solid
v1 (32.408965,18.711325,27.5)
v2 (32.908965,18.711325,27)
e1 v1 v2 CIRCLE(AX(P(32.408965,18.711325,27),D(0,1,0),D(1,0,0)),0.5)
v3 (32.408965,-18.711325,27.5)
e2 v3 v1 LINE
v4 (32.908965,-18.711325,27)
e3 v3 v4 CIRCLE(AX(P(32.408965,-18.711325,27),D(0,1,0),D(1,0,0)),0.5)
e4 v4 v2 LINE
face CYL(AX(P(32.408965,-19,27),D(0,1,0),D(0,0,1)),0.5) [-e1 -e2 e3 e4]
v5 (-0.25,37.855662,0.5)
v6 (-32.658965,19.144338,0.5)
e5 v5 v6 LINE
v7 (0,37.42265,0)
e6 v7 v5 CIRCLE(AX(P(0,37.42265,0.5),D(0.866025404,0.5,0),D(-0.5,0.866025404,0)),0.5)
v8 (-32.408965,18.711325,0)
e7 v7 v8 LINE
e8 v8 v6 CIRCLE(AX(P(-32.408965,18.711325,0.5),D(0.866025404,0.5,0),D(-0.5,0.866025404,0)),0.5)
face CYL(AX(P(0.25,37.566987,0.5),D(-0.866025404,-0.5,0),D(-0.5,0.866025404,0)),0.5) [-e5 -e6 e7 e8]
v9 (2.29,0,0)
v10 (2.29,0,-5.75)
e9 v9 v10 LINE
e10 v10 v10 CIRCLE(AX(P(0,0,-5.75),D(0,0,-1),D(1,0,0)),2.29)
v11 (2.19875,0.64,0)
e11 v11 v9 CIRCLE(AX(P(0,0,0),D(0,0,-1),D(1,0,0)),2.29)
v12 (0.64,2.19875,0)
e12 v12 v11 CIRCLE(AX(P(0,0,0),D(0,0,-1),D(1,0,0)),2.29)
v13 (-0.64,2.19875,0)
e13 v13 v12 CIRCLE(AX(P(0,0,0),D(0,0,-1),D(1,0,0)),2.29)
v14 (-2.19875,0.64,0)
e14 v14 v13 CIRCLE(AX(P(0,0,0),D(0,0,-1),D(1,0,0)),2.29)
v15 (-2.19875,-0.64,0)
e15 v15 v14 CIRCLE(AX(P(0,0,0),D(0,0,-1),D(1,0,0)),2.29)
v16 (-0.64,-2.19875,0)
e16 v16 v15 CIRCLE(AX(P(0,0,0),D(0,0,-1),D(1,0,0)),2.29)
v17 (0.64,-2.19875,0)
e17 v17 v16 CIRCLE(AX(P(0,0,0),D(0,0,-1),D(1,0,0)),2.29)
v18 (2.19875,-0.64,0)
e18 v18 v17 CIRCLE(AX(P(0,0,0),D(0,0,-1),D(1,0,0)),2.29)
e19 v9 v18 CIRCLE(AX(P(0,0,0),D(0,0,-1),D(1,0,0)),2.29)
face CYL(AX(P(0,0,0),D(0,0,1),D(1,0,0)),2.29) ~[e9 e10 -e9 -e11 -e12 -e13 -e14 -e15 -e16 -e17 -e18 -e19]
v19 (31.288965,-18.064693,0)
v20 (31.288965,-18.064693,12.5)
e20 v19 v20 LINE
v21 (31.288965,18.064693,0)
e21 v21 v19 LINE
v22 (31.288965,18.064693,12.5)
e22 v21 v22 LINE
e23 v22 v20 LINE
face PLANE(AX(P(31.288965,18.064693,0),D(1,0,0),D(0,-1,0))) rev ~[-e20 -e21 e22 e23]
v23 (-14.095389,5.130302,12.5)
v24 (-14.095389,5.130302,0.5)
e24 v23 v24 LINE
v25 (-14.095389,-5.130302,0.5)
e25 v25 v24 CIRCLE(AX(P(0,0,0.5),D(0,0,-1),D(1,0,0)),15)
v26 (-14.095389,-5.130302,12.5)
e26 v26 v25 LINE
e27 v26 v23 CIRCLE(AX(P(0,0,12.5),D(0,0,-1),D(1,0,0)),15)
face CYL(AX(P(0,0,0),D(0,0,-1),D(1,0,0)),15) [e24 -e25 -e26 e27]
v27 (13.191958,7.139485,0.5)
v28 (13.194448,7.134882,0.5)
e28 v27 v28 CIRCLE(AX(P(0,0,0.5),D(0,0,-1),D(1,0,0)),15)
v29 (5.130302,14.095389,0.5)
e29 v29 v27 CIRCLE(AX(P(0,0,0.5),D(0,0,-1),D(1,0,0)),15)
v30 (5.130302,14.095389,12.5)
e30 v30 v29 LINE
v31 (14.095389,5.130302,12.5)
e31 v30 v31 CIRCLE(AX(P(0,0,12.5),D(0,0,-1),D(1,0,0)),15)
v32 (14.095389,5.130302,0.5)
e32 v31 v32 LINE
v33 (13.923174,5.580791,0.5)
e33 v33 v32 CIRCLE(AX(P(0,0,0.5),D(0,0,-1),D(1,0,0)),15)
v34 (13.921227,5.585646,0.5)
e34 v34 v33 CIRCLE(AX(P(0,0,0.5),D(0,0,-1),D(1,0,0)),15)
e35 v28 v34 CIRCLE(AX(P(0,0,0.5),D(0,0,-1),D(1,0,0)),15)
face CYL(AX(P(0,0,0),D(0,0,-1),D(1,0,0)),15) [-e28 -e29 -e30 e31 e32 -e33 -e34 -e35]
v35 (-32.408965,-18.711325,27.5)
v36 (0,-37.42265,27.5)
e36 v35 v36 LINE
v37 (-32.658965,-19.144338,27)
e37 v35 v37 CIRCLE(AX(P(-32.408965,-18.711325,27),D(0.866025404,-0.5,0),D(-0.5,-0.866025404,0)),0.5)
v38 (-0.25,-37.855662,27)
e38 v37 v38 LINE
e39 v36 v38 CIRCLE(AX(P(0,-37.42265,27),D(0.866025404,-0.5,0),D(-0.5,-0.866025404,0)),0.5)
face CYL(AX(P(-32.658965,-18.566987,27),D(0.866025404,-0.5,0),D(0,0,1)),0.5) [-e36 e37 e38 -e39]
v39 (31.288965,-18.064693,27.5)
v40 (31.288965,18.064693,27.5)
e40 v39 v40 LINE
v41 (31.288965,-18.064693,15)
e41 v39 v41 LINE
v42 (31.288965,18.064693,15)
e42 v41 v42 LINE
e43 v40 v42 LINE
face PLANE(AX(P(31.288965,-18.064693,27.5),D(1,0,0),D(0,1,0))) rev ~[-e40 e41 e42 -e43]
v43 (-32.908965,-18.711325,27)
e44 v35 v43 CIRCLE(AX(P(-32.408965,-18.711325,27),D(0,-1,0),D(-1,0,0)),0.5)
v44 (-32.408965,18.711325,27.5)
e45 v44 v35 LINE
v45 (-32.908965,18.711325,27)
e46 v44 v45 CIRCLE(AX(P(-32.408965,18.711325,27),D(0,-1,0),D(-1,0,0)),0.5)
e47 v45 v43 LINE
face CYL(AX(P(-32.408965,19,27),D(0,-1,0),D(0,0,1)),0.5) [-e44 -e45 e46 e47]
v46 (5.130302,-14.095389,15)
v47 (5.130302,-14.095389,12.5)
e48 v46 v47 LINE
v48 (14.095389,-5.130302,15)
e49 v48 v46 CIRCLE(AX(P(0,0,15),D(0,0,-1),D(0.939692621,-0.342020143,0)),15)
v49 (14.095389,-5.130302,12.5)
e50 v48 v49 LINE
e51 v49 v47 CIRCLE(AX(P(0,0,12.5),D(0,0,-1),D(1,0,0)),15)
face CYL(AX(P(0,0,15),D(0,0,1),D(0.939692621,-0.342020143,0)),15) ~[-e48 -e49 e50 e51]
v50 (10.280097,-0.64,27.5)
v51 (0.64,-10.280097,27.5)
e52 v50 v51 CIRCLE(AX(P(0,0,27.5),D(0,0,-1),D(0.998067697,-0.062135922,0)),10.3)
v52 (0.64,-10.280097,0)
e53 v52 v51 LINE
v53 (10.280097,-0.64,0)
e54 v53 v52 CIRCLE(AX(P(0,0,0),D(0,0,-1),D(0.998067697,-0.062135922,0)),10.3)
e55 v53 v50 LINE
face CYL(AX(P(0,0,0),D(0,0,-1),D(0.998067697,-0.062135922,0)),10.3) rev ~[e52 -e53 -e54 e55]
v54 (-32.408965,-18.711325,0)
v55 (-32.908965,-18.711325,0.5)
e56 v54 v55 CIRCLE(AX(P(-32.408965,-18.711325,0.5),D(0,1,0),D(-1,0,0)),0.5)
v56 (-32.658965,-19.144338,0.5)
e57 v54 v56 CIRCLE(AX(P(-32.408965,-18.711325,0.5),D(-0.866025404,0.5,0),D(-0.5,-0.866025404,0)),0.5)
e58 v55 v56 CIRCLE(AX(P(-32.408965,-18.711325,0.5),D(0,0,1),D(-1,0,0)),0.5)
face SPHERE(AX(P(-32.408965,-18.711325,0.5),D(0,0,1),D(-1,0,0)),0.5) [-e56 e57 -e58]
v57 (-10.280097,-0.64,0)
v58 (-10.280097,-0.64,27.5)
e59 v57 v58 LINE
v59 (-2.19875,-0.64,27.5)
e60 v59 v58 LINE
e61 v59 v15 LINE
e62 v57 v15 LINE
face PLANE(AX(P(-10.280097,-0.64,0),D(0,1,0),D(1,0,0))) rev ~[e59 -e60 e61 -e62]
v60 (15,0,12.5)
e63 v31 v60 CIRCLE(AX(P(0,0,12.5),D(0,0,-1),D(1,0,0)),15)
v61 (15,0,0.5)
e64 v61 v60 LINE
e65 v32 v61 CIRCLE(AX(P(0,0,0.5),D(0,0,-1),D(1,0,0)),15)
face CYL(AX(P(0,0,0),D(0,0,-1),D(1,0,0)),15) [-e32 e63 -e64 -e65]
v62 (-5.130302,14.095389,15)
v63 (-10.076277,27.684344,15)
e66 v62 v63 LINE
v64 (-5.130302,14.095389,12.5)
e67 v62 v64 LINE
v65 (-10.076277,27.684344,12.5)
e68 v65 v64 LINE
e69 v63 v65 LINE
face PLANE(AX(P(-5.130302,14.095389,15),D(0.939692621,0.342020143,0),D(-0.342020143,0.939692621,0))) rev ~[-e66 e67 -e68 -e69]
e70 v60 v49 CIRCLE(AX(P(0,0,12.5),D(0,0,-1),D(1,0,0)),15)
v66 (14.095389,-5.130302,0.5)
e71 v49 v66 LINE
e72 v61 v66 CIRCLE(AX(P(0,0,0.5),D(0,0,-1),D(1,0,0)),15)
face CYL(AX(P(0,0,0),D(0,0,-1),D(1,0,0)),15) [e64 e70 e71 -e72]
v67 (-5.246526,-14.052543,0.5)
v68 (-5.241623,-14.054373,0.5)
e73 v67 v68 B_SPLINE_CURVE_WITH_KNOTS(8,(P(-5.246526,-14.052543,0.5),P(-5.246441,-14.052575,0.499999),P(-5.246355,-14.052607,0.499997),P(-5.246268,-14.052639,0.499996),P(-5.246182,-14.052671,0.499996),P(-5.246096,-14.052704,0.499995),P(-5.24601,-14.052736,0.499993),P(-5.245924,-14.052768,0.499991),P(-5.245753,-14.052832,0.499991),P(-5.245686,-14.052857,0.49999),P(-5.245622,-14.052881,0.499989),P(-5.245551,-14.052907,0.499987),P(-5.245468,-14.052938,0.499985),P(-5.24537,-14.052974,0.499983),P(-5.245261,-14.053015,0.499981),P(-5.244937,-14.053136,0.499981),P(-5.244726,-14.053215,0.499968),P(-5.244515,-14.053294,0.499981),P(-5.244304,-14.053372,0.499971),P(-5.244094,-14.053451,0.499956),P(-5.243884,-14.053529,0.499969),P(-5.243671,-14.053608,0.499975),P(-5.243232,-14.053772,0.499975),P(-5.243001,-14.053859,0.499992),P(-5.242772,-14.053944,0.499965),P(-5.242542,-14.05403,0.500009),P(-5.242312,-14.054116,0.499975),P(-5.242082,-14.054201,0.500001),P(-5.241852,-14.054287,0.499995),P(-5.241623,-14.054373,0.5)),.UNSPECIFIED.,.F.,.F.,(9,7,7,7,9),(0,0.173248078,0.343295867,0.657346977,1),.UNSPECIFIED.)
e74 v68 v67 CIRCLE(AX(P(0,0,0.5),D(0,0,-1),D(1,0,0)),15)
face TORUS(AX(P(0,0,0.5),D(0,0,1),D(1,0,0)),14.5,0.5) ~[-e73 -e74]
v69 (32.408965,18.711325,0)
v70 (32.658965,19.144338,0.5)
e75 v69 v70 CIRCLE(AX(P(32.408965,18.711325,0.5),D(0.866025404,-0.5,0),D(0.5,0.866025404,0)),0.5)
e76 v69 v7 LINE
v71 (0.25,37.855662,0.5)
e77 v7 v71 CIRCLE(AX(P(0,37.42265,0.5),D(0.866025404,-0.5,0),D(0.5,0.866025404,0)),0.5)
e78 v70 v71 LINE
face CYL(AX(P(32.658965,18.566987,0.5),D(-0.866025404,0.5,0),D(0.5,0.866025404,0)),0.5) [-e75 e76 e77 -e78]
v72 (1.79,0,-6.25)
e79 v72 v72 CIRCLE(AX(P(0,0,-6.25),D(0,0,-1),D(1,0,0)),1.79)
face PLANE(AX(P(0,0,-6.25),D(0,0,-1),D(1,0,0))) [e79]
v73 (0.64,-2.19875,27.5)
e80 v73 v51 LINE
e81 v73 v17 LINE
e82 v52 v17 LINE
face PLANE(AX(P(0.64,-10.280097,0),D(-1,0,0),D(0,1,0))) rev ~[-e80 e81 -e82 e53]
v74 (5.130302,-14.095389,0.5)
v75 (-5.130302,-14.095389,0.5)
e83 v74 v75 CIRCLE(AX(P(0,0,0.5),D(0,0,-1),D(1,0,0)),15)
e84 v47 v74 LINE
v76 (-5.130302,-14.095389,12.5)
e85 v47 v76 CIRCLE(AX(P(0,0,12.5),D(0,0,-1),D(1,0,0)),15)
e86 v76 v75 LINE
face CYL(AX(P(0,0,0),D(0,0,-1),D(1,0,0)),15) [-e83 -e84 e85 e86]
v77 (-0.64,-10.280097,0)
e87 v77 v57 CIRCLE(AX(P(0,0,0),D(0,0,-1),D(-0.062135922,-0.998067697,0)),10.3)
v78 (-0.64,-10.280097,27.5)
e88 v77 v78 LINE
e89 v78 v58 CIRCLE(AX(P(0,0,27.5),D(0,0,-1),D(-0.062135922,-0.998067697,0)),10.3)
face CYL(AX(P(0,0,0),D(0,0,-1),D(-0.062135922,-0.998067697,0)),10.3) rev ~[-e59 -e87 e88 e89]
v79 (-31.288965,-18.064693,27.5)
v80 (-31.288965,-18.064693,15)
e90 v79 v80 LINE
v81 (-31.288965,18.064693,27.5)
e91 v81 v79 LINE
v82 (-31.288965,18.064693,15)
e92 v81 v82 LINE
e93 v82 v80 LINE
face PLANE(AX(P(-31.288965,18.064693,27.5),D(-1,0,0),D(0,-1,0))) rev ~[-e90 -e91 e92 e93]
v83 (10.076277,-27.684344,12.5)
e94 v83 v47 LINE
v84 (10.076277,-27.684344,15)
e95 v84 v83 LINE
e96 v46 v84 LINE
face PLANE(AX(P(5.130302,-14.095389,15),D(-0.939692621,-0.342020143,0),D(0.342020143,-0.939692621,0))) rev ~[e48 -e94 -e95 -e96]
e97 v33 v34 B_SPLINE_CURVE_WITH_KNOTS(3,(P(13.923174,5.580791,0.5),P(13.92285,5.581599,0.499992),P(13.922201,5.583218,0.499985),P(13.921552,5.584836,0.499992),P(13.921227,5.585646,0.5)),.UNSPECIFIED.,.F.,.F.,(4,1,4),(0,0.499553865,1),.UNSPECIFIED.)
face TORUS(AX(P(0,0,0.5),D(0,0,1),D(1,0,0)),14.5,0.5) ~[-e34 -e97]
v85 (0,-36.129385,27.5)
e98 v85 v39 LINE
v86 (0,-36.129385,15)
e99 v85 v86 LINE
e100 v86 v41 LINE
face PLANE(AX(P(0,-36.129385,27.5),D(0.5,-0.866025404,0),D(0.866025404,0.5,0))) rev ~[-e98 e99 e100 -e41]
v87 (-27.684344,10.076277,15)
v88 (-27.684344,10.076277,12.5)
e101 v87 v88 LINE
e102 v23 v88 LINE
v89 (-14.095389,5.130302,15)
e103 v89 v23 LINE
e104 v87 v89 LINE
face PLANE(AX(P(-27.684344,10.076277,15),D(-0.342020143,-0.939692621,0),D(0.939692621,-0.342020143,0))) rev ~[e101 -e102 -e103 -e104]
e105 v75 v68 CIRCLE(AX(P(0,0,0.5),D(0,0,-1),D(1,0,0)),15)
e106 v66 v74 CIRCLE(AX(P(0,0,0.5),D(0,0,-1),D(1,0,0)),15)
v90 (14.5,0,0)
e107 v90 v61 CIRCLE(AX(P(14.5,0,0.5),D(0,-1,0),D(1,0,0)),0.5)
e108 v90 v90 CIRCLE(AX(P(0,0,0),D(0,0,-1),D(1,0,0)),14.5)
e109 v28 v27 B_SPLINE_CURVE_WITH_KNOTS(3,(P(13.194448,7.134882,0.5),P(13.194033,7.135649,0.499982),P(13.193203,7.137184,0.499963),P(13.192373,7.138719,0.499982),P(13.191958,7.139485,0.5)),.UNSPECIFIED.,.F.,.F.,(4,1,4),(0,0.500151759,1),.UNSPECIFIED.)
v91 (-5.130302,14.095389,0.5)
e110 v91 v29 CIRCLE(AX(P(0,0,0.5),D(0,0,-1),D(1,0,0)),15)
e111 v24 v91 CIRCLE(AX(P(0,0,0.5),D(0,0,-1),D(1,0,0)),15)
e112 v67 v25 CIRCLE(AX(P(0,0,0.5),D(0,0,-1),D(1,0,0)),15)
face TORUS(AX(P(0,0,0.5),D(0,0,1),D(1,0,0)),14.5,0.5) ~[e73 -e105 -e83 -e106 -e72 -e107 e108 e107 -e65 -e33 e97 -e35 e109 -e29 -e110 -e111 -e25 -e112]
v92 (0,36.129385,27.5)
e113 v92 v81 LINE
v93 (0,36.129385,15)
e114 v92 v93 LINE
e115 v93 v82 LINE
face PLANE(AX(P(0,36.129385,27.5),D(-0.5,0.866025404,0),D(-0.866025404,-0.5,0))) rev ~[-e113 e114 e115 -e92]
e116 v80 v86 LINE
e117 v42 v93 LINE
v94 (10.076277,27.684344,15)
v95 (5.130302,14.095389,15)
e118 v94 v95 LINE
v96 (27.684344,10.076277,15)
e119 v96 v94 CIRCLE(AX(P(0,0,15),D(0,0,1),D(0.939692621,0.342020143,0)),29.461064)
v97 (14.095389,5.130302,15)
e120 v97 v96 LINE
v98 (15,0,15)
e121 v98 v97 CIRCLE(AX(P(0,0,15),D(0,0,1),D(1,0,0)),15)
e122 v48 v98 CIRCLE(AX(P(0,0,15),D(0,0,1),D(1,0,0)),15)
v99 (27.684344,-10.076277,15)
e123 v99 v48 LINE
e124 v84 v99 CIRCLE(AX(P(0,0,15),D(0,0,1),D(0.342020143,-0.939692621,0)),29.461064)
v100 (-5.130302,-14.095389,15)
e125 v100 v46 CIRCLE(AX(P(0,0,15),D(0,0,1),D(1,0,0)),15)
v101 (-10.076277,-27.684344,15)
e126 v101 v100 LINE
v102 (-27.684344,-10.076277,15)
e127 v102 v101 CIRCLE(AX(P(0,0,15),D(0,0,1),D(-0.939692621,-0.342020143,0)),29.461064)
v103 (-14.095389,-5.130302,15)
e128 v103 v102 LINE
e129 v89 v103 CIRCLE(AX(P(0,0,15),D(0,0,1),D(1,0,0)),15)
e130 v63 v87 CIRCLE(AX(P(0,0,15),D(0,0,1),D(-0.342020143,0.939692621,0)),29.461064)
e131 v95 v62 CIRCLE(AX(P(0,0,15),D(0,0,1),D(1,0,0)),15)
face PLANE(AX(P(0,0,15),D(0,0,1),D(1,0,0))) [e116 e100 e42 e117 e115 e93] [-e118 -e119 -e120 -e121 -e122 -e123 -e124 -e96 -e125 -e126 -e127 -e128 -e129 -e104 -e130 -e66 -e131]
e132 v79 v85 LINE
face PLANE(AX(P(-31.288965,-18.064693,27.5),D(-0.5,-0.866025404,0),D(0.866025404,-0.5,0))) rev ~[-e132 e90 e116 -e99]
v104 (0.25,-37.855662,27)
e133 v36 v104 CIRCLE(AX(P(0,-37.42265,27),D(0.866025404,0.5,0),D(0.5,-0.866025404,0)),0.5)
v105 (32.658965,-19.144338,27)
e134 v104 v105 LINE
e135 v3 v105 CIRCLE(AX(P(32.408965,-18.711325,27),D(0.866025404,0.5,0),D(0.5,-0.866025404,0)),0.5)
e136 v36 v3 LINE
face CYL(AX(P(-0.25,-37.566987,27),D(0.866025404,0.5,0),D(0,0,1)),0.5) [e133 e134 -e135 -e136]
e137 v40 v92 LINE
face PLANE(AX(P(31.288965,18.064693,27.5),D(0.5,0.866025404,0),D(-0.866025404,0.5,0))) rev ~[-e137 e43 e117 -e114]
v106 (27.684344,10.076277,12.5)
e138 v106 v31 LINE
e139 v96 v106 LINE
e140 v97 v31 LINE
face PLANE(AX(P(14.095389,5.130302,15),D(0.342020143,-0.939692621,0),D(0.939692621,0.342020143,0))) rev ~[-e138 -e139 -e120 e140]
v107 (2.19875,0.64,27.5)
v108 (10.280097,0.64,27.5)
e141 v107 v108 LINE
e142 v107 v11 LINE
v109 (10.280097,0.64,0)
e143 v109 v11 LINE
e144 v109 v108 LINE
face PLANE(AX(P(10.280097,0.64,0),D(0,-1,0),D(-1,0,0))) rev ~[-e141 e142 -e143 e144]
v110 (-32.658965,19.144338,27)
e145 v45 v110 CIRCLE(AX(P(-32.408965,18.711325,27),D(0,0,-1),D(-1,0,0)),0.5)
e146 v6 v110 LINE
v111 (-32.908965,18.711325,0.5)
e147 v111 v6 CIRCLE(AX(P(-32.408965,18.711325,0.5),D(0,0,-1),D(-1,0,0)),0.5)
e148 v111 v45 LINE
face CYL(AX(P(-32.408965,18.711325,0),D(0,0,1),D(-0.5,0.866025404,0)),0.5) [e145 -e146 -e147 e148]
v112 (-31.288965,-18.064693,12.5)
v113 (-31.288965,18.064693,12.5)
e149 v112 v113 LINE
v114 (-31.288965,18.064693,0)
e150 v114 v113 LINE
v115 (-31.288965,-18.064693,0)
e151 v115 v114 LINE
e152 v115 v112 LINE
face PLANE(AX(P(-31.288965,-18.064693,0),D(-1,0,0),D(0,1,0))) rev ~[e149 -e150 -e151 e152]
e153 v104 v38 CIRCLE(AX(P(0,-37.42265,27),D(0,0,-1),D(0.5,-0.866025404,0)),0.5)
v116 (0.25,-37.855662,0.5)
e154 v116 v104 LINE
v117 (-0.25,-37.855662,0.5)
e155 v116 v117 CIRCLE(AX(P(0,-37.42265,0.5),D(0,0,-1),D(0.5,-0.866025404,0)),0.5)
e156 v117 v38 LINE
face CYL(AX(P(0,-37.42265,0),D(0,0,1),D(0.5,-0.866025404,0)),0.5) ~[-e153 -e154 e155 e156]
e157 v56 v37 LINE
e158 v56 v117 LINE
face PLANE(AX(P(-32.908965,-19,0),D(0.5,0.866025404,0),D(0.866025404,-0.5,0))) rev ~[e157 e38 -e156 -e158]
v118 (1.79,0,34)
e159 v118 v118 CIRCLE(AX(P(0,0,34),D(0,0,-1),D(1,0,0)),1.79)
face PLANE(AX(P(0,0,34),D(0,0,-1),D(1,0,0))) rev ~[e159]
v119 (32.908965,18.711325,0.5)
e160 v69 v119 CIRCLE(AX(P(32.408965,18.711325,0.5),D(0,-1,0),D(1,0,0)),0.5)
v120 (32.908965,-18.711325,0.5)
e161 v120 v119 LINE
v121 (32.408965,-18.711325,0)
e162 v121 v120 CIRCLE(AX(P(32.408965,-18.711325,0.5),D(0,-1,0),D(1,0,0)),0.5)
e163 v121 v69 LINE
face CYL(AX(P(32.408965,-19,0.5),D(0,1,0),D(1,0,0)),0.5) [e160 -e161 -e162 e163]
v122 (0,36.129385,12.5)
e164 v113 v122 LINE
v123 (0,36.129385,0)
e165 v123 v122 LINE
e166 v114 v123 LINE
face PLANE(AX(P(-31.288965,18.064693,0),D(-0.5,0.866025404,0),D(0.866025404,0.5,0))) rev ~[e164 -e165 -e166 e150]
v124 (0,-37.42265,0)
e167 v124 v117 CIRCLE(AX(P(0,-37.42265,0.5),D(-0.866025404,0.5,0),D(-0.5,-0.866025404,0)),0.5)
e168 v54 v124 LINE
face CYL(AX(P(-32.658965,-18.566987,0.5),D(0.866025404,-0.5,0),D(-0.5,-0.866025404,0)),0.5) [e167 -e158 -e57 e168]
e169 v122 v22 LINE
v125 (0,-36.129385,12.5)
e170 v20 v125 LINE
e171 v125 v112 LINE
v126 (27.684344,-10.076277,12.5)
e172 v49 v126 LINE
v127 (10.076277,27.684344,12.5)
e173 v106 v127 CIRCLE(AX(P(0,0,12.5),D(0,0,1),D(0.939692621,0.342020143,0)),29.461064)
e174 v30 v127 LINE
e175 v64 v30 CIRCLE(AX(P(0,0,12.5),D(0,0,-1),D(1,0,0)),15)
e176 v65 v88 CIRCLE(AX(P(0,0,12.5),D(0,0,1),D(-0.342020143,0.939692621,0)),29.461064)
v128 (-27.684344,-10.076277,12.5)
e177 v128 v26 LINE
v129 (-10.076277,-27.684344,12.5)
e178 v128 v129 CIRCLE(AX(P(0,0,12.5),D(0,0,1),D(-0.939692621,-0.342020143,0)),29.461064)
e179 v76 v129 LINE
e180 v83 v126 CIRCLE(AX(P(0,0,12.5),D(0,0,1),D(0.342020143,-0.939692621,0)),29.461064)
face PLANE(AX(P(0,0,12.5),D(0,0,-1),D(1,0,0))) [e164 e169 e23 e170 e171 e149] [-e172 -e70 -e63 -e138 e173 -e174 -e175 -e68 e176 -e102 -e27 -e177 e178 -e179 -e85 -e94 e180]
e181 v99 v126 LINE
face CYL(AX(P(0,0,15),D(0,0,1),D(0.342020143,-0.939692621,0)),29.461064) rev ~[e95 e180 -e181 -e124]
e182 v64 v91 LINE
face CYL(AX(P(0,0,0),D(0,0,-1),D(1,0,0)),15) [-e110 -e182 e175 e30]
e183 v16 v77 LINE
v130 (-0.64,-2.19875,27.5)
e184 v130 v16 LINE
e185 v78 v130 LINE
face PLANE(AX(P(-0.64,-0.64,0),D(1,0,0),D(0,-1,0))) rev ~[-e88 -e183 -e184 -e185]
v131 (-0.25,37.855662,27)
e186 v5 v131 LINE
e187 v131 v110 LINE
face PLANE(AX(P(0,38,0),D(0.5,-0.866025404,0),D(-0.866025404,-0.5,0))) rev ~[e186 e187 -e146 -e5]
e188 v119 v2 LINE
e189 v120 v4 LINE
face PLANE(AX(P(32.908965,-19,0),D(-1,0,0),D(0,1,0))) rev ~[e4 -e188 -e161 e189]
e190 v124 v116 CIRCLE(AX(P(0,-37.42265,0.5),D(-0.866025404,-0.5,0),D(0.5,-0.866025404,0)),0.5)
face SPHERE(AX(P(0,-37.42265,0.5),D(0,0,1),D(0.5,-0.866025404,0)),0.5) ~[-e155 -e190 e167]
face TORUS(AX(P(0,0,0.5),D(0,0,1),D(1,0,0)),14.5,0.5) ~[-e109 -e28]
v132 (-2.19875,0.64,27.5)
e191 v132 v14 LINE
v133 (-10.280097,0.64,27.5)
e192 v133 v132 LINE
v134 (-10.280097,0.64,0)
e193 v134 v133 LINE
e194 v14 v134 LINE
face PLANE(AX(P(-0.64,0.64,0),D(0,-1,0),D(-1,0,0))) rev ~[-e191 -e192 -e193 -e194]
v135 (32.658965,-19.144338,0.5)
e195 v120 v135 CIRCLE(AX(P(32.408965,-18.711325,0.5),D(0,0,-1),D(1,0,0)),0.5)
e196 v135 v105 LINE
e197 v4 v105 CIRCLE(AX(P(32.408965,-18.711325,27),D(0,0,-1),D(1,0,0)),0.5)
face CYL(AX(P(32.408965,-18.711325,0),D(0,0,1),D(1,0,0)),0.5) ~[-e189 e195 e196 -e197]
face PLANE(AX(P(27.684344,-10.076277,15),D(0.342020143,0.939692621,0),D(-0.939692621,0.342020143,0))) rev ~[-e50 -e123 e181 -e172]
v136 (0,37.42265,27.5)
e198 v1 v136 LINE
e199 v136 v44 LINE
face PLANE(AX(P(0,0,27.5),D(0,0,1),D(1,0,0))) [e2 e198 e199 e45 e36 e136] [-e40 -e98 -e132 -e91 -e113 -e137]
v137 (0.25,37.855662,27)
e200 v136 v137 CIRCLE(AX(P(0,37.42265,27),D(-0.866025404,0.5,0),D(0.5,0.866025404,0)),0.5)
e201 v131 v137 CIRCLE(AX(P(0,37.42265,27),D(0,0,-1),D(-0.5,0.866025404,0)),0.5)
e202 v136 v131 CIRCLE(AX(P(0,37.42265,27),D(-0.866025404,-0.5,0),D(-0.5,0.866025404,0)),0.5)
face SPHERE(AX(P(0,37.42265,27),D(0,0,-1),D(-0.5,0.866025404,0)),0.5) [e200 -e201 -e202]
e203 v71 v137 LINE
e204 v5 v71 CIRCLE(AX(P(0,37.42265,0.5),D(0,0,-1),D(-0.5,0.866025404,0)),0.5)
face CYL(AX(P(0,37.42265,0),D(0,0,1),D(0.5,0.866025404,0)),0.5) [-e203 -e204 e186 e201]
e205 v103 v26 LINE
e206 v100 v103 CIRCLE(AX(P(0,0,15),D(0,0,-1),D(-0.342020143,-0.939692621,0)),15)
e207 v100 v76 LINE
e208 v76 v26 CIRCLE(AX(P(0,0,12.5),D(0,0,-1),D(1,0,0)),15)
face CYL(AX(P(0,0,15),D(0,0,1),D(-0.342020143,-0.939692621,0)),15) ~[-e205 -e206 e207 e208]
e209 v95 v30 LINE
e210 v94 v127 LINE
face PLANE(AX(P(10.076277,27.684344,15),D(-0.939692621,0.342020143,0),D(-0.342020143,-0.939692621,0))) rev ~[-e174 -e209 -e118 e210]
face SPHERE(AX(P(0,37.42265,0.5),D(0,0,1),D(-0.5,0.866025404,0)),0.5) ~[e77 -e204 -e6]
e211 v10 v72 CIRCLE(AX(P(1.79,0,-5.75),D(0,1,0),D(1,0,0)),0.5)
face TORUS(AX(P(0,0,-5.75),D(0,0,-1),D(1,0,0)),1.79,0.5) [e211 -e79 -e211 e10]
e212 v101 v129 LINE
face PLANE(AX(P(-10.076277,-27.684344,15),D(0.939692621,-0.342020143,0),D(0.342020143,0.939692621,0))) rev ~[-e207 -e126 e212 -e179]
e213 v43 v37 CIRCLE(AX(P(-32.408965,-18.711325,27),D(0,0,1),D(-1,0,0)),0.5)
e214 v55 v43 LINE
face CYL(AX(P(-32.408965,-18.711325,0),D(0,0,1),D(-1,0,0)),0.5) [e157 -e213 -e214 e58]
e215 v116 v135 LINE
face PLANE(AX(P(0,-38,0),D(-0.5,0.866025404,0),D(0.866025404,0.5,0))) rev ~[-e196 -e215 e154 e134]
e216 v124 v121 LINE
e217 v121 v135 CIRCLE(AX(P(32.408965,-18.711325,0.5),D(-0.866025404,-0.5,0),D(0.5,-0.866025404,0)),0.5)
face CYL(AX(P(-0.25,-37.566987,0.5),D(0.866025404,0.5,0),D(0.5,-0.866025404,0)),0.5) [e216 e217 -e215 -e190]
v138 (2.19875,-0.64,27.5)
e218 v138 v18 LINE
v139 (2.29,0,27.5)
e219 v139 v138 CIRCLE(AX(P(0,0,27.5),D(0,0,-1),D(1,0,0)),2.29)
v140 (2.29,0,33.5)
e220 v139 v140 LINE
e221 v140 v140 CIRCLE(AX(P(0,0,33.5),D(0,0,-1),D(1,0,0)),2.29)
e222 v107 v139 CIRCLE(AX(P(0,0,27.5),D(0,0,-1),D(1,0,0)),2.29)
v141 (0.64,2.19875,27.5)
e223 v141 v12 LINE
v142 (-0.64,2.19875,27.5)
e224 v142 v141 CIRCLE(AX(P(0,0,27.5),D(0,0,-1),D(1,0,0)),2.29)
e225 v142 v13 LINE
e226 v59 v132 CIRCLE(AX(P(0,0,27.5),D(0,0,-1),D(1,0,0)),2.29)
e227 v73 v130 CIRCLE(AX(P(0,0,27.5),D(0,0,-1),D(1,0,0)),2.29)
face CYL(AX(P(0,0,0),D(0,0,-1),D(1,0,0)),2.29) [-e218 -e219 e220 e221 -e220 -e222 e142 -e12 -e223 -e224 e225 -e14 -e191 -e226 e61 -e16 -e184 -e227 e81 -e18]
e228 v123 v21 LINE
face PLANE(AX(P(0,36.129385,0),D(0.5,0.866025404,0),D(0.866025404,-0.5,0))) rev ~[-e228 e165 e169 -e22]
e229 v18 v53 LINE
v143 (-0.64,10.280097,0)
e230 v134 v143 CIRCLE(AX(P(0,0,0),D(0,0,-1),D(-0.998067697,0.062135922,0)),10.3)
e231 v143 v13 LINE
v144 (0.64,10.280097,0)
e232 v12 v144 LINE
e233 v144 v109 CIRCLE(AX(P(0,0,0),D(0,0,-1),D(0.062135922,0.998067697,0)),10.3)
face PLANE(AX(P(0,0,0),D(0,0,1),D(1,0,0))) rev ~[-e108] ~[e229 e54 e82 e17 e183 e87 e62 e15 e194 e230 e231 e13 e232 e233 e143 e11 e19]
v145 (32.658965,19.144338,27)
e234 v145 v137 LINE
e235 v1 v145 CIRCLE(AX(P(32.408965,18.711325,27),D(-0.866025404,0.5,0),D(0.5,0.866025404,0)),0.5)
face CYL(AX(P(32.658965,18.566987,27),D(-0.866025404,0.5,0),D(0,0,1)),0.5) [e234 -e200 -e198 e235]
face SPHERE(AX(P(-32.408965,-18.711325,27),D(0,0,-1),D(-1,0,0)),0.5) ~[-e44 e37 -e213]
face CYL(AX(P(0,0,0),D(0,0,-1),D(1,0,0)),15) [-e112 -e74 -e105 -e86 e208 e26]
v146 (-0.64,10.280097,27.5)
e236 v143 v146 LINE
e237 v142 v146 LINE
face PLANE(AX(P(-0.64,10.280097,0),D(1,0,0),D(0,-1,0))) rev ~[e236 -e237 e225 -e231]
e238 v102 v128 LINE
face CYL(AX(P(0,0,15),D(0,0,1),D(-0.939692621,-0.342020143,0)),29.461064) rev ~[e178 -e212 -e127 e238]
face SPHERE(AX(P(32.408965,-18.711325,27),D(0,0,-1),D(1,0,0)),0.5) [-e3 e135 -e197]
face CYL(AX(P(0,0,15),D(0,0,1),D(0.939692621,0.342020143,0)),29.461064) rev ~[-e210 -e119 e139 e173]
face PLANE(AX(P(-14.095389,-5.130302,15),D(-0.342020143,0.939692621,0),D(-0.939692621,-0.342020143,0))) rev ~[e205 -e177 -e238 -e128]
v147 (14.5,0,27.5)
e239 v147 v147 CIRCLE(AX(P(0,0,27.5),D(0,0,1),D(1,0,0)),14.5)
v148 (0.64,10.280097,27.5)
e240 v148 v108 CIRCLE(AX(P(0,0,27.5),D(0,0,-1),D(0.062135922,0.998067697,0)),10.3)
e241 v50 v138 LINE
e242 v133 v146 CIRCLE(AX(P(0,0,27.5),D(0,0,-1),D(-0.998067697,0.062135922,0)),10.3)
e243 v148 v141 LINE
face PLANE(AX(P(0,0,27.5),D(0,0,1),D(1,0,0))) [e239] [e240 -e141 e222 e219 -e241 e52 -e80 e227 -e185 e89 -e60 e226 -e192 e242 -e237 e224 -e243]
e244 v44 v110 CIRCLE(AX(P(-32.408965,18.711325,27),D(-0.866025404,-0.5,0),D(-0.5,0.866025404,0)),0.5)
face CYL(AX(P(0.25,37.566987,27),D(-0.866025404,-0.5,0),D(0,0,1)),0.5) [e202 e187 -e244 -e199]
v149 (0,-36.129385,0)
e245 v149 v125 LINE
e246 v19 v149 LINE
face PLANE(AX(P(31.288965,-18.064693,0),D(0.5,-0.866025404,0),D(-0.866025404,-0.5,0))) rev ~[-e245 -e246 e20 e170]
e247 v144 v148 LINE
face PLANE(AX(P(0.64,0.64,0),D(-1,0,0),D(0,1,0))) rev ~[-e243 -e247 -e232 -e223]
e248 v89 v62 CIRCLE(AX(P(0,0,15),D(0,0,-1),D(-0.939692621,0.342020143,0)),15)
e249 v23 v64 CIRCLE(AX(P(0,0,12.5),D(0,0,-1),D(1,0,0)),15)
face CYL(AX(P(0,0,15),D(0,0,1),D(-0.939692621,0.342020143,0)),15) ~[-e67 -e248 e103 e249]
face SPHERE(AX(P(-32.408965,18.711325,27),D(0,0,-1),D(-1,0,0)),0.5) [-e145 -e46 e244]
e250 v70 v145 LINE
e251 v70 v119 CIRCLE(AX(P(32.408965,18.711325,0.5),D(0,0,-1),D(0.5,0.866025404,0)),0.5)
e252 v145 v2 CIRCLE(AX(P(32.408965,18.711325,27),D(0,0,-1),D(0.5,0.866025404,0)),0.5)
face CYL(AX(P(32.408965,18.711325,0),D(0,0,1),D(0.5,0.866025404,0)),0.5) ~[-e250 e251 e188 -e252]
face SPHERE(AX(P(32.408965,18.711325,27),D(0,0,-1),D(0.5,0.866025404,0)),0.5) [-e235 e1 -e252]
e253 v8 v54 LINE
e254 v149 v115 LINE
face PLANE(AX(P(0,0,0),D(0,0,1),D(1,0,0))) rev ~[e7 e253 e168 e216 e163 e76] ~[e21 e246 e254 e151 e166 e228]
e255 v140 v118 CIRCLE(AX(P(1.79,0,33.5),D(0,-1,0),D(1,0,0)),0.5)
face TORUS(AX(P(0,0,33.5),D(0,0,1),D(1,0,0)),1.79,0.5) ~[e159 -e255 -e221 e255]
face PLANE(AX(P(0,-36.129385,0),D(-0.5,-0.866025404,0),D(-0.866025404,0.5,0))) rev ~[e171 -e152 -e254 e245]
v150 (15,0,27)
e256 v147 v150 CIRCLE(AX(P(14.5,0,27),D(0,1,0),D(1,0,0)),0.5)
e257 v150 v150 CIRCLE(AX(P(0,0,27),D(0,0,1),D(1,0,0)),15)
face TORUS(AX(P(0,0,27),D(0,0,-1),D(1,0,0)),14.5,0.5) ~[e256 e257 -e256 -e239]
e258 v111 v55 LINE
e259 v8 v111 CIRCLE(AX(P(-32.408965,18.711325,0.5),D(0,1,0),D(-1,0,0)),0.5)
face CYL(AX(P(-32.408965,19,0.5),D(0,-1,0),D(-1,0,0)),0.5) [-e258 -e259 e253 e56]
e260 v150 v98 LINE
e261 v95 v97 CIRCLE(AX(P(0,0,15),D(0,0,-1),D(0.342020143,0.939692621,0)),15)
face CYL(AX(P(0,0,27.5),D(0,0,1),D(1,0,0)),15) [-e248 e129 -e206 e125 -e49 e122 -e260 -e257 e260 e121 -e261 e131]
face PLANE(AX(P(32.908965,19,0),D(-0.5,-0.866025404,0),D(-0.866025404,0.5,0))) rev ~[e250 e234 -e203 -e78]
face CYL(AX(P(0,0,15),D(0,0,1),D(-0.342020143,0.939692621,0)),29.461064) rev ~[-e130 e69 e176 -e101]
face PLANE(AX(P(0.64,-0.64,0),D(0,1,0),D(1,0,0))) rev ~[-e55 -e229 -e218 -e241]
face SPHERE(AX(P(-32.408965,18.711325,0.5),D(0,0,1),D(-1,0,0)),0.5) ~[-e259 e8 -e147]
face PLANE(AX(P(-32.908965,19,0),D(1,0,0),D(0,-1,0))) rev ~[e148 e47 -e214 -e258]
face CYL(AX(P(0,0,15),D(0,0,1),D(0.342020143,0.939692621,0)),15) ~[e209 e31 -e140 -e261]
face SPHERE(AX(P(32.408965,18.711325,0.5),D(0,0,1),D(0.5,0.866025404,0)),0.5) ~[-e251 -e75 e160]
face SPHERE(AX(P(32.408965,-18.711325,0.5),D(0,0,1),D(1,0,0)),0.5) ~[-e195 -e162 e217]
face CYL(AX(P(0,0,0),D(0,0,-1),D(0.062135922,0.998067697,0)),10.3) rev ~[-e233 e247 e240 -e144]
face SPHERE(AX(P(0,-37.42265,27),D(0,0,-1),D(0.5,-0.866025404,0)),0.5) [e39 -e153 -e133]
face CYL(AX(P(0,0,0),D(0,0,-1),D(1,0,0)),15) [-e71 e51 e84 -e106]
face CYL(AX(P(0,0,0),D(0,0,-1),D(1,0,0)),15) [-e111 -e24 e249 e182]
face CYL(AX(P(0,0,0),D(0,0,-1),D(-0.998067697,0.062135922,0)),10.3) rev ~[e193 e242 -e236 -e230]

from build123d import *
from build123d import SkipClean  # not in build123d's __all__

# Parameters (mm, degrees)
F1_DEPTH      = 27.5
F2_R          = 15
F3_DEPTH      = 12.5
F4_R          = 15
F5_DEPTH      = 12.5
F7_DEPTH      = 27.501
F8_R          = 2.29
F9_DEPTH      = 6.25
F9_DEPTH_BACK = 34
F10_R         = 0.5
F12_DEPTH     = 21.251


with BuildPart() as f1:
    # F0 (on Top) → F1 (new body)
    with BuildSketch(Plane.XY):
        Polygon((32.9089653438, 19), (0, 38), (-32.9089653438, 19), (-32.9089653438, -19), (0, -38), (32.9089653438, -19), align=None)
    extrude(amount=F1_DEPTH)

    # F2 (on face) → F3 (cut)
    with BuildSketch(Plane.XY.offset(27.5)):
        Polygon((0, -36.1293851278), (31.2889653438, -18.0646925639), (31.2889653438, 18.0646925639), (0, 36.1293851278), (-31.2889653438, 18.0646925639), (-31.2889653438, -18.0646925639), align=None)
        Circle(F2_R, mode=Mode.SUBTRACT)
    extrude(amount=-F3_DEPTH, mode=Mode.SUBTRACT)

    # F4 (on face) → F5 (cut)
    with BuildSketch(Plane(origin=(0, 0, 0), x_dir=(1, 0, 0), z_dir=(0, 0, -1))):
        Polygon((0, -36.1293851278), (31.2889653438, -18.0646925639), (31.2889653438, 18.0646925639), (0, 36.1293851278), (-31.2889653438, 18.0646925639), (-31.2889653438, -18.0646925639), align=None)
        Circle(F4_R, mode=Mode.SUBTRACT)
    extrude(amount=-F5_DEPTH, mode=Mode.SUBTRACT)

    # F6 (on face) → F7 (cut, through all)
    with BuildSketch(Plane(origin=(0, 0, 0), x_dir=(1, 0, 0), z_dir=(0, 0, -1))):
        with BuildLine():
            Line((0.64, 0.64), (10.2800972758, 0.64))
            ThreePointArc((10.2800972758, 0.64), (7.2831998462, 7.2831998462), (0.64, 10.2800972758))
            Line((0.64, 10.2800972758), (0.64, 0.64))
        make_face()
        with BuildLine():
            Line((0.64, -0.64), (0.64, -10.2800972758))
            ThreePointArc((0.64, -10.2800972758), (7.2831998462, -7.2831998462), (10.2800972758, -0.64))
            Line((10.2800972758, -0.64), (0.64, -0.64))
        make_face()
        with BuildLine():
            ThreePointArc((-10.2800972758, -0.64), (-7.2831998462, -7.2831998462), (-0.64, -10.2800972758))
            Line((-0.64, -10.2800972758), (-0.64, -0.64))
            Line((-0.64, -0.64), (-10.2800972758, -0.64))
        make_face()
        with BuildLine():
            ThreePointArc((-0.64, 10.2800972758), (-7.2831998462, 7.2831998462), (-10.2800972758, 0.64))
            Line((-10.2800972758, 0.64), (-0.64, 0.64))
            Line((-0.64, 0.64), (-0.64, 10.2800972758))
        make_face()
    extrude(amount=-F7_DEPTH, mode=Mode.SUBTRACT)

    # F8 (on face) → F9 (join, two sides)
    with BuildSketch(Plane(origin=(0, 0, 0), x_dir=(1, 0, 0), z_dir=(0, 0, -1))) as f9_sk:
        Circle(F8_R)
    extrude(amount=F9_DEPTH)
    extrude(f9_sk.sketch, amount=-F9_DEPTH_BACK)

    # F10
    f10_edges = [f1.edges().sort_by_distance(p)[0] for p in [
        (-15, 0, 0),
        (-15, 0, 27.5),
        (-2.29, 0, -6.25),
        (-2.29, 0, 34),
        (-32.908965, 19, 13.75),
        (-32.908965, -19, 13.75),
        (-32.908965, 0, 0),
        (-32.908965, 0, 27.5),
        (0, 38, 13.75),
        (-16.454483, 28.5, 0),
        (-16.454483, 28.5, 27.5),
        (32.908965, 19, 13.75),
        (16.454483, 28.5, 0),
        (16.454483, 28.5, 27.5),
        (32.908965, -19, 13.75),
        (32.908965, 0, 0),
        (32.908965, 0, 27.5),
        (0, -38, 13.75),
        (16.454483, -28.5, 0),
        (16.454483, -28.5, 27.5),
        (-16.454483, -28.5, 0),
        (-16.454483, -28.5, 27.5),
    ]]
    fillet(f10_edges, radius=F10_R)

    # F11 (on face) → F12 (cut, through all)
    with BuildSketch(Plane.XY.offset(15)):
        with BuildLine():
            Line((-14.0953893118, -5.1303021499), (-27.6843442082, -10.076277247))
            ThreePointArc((-27.6843442082, -10.076277247), (-20.83211796, -20.83211796), (-10.076277247, -27.6843442082))
            Line((-10.076277247, -27.6843442082), (-5.1303021499, -14.0953893118))
            ThreePointArc((-5.1303021499, -14.0953893118), (-10.6066017178, -10.6066017178), (-14.0953893118, -5.1303021499))
        make_face()
        with BuildLine():
            Line((-27.6843442082, 10.076277247), (-14.0953893118, 5.1303021499))
            ThreePointArc((-14.0953893118, 5.1303021499), (-10.6066017178, 10.6066017178), (-5.1303021499, 14.0953893118))
            Line((-5.1303021499, 14.0953893118), (-10.076277247, 27.6843442082))
            ThreePointArc((-10.076277247, 27.6843442082), (-20.83211796, 20.83211796), (-27.6843442082, 10.076277247))
        make_face()
        with BuildLine():
            Line((10.076277247, 27.6843442082), (5.1303021499, 14.0953893118))
            ThreePointArc((5.1303021499, 14.0953893118), (10.6066017178, 10.6066017178), (14.0953893118, 5.1303021499))
            Line((14.0953893118, 5.1303021499), (27.6843442082, 10.076277247))
            ThreePointArc((27.6843442082, 10.076277247), (20.83211796, 20.83211796), (10.076277247, 27.6843442082))
        make_face()
        with BuildLine():
            ThreePointArc((14.0953893118, -5.1303021499), (10.6066017178, -10.6066017178), (5.1303021499, -14.0953893118))
            Line((5.1303021499, -14.0953893118), (10.076277247, -27.6843442082))
            ThreePointArc((10.076277247, -27.6843442082), (20.83211796, -20.83211796), (27.6843442082, -10.076277247))
            Line((27.6843442082, -10.076277247), (14.0953893118, -5.1303021499))
        make_face()
    with SkipClean():  # cleaning this boolean's faces spoils the solid; the shape is the same uncleaned
        extrude(amount=-F12_DEPTH, mode=Mode.SUBTRACT)


solid = f1.part
